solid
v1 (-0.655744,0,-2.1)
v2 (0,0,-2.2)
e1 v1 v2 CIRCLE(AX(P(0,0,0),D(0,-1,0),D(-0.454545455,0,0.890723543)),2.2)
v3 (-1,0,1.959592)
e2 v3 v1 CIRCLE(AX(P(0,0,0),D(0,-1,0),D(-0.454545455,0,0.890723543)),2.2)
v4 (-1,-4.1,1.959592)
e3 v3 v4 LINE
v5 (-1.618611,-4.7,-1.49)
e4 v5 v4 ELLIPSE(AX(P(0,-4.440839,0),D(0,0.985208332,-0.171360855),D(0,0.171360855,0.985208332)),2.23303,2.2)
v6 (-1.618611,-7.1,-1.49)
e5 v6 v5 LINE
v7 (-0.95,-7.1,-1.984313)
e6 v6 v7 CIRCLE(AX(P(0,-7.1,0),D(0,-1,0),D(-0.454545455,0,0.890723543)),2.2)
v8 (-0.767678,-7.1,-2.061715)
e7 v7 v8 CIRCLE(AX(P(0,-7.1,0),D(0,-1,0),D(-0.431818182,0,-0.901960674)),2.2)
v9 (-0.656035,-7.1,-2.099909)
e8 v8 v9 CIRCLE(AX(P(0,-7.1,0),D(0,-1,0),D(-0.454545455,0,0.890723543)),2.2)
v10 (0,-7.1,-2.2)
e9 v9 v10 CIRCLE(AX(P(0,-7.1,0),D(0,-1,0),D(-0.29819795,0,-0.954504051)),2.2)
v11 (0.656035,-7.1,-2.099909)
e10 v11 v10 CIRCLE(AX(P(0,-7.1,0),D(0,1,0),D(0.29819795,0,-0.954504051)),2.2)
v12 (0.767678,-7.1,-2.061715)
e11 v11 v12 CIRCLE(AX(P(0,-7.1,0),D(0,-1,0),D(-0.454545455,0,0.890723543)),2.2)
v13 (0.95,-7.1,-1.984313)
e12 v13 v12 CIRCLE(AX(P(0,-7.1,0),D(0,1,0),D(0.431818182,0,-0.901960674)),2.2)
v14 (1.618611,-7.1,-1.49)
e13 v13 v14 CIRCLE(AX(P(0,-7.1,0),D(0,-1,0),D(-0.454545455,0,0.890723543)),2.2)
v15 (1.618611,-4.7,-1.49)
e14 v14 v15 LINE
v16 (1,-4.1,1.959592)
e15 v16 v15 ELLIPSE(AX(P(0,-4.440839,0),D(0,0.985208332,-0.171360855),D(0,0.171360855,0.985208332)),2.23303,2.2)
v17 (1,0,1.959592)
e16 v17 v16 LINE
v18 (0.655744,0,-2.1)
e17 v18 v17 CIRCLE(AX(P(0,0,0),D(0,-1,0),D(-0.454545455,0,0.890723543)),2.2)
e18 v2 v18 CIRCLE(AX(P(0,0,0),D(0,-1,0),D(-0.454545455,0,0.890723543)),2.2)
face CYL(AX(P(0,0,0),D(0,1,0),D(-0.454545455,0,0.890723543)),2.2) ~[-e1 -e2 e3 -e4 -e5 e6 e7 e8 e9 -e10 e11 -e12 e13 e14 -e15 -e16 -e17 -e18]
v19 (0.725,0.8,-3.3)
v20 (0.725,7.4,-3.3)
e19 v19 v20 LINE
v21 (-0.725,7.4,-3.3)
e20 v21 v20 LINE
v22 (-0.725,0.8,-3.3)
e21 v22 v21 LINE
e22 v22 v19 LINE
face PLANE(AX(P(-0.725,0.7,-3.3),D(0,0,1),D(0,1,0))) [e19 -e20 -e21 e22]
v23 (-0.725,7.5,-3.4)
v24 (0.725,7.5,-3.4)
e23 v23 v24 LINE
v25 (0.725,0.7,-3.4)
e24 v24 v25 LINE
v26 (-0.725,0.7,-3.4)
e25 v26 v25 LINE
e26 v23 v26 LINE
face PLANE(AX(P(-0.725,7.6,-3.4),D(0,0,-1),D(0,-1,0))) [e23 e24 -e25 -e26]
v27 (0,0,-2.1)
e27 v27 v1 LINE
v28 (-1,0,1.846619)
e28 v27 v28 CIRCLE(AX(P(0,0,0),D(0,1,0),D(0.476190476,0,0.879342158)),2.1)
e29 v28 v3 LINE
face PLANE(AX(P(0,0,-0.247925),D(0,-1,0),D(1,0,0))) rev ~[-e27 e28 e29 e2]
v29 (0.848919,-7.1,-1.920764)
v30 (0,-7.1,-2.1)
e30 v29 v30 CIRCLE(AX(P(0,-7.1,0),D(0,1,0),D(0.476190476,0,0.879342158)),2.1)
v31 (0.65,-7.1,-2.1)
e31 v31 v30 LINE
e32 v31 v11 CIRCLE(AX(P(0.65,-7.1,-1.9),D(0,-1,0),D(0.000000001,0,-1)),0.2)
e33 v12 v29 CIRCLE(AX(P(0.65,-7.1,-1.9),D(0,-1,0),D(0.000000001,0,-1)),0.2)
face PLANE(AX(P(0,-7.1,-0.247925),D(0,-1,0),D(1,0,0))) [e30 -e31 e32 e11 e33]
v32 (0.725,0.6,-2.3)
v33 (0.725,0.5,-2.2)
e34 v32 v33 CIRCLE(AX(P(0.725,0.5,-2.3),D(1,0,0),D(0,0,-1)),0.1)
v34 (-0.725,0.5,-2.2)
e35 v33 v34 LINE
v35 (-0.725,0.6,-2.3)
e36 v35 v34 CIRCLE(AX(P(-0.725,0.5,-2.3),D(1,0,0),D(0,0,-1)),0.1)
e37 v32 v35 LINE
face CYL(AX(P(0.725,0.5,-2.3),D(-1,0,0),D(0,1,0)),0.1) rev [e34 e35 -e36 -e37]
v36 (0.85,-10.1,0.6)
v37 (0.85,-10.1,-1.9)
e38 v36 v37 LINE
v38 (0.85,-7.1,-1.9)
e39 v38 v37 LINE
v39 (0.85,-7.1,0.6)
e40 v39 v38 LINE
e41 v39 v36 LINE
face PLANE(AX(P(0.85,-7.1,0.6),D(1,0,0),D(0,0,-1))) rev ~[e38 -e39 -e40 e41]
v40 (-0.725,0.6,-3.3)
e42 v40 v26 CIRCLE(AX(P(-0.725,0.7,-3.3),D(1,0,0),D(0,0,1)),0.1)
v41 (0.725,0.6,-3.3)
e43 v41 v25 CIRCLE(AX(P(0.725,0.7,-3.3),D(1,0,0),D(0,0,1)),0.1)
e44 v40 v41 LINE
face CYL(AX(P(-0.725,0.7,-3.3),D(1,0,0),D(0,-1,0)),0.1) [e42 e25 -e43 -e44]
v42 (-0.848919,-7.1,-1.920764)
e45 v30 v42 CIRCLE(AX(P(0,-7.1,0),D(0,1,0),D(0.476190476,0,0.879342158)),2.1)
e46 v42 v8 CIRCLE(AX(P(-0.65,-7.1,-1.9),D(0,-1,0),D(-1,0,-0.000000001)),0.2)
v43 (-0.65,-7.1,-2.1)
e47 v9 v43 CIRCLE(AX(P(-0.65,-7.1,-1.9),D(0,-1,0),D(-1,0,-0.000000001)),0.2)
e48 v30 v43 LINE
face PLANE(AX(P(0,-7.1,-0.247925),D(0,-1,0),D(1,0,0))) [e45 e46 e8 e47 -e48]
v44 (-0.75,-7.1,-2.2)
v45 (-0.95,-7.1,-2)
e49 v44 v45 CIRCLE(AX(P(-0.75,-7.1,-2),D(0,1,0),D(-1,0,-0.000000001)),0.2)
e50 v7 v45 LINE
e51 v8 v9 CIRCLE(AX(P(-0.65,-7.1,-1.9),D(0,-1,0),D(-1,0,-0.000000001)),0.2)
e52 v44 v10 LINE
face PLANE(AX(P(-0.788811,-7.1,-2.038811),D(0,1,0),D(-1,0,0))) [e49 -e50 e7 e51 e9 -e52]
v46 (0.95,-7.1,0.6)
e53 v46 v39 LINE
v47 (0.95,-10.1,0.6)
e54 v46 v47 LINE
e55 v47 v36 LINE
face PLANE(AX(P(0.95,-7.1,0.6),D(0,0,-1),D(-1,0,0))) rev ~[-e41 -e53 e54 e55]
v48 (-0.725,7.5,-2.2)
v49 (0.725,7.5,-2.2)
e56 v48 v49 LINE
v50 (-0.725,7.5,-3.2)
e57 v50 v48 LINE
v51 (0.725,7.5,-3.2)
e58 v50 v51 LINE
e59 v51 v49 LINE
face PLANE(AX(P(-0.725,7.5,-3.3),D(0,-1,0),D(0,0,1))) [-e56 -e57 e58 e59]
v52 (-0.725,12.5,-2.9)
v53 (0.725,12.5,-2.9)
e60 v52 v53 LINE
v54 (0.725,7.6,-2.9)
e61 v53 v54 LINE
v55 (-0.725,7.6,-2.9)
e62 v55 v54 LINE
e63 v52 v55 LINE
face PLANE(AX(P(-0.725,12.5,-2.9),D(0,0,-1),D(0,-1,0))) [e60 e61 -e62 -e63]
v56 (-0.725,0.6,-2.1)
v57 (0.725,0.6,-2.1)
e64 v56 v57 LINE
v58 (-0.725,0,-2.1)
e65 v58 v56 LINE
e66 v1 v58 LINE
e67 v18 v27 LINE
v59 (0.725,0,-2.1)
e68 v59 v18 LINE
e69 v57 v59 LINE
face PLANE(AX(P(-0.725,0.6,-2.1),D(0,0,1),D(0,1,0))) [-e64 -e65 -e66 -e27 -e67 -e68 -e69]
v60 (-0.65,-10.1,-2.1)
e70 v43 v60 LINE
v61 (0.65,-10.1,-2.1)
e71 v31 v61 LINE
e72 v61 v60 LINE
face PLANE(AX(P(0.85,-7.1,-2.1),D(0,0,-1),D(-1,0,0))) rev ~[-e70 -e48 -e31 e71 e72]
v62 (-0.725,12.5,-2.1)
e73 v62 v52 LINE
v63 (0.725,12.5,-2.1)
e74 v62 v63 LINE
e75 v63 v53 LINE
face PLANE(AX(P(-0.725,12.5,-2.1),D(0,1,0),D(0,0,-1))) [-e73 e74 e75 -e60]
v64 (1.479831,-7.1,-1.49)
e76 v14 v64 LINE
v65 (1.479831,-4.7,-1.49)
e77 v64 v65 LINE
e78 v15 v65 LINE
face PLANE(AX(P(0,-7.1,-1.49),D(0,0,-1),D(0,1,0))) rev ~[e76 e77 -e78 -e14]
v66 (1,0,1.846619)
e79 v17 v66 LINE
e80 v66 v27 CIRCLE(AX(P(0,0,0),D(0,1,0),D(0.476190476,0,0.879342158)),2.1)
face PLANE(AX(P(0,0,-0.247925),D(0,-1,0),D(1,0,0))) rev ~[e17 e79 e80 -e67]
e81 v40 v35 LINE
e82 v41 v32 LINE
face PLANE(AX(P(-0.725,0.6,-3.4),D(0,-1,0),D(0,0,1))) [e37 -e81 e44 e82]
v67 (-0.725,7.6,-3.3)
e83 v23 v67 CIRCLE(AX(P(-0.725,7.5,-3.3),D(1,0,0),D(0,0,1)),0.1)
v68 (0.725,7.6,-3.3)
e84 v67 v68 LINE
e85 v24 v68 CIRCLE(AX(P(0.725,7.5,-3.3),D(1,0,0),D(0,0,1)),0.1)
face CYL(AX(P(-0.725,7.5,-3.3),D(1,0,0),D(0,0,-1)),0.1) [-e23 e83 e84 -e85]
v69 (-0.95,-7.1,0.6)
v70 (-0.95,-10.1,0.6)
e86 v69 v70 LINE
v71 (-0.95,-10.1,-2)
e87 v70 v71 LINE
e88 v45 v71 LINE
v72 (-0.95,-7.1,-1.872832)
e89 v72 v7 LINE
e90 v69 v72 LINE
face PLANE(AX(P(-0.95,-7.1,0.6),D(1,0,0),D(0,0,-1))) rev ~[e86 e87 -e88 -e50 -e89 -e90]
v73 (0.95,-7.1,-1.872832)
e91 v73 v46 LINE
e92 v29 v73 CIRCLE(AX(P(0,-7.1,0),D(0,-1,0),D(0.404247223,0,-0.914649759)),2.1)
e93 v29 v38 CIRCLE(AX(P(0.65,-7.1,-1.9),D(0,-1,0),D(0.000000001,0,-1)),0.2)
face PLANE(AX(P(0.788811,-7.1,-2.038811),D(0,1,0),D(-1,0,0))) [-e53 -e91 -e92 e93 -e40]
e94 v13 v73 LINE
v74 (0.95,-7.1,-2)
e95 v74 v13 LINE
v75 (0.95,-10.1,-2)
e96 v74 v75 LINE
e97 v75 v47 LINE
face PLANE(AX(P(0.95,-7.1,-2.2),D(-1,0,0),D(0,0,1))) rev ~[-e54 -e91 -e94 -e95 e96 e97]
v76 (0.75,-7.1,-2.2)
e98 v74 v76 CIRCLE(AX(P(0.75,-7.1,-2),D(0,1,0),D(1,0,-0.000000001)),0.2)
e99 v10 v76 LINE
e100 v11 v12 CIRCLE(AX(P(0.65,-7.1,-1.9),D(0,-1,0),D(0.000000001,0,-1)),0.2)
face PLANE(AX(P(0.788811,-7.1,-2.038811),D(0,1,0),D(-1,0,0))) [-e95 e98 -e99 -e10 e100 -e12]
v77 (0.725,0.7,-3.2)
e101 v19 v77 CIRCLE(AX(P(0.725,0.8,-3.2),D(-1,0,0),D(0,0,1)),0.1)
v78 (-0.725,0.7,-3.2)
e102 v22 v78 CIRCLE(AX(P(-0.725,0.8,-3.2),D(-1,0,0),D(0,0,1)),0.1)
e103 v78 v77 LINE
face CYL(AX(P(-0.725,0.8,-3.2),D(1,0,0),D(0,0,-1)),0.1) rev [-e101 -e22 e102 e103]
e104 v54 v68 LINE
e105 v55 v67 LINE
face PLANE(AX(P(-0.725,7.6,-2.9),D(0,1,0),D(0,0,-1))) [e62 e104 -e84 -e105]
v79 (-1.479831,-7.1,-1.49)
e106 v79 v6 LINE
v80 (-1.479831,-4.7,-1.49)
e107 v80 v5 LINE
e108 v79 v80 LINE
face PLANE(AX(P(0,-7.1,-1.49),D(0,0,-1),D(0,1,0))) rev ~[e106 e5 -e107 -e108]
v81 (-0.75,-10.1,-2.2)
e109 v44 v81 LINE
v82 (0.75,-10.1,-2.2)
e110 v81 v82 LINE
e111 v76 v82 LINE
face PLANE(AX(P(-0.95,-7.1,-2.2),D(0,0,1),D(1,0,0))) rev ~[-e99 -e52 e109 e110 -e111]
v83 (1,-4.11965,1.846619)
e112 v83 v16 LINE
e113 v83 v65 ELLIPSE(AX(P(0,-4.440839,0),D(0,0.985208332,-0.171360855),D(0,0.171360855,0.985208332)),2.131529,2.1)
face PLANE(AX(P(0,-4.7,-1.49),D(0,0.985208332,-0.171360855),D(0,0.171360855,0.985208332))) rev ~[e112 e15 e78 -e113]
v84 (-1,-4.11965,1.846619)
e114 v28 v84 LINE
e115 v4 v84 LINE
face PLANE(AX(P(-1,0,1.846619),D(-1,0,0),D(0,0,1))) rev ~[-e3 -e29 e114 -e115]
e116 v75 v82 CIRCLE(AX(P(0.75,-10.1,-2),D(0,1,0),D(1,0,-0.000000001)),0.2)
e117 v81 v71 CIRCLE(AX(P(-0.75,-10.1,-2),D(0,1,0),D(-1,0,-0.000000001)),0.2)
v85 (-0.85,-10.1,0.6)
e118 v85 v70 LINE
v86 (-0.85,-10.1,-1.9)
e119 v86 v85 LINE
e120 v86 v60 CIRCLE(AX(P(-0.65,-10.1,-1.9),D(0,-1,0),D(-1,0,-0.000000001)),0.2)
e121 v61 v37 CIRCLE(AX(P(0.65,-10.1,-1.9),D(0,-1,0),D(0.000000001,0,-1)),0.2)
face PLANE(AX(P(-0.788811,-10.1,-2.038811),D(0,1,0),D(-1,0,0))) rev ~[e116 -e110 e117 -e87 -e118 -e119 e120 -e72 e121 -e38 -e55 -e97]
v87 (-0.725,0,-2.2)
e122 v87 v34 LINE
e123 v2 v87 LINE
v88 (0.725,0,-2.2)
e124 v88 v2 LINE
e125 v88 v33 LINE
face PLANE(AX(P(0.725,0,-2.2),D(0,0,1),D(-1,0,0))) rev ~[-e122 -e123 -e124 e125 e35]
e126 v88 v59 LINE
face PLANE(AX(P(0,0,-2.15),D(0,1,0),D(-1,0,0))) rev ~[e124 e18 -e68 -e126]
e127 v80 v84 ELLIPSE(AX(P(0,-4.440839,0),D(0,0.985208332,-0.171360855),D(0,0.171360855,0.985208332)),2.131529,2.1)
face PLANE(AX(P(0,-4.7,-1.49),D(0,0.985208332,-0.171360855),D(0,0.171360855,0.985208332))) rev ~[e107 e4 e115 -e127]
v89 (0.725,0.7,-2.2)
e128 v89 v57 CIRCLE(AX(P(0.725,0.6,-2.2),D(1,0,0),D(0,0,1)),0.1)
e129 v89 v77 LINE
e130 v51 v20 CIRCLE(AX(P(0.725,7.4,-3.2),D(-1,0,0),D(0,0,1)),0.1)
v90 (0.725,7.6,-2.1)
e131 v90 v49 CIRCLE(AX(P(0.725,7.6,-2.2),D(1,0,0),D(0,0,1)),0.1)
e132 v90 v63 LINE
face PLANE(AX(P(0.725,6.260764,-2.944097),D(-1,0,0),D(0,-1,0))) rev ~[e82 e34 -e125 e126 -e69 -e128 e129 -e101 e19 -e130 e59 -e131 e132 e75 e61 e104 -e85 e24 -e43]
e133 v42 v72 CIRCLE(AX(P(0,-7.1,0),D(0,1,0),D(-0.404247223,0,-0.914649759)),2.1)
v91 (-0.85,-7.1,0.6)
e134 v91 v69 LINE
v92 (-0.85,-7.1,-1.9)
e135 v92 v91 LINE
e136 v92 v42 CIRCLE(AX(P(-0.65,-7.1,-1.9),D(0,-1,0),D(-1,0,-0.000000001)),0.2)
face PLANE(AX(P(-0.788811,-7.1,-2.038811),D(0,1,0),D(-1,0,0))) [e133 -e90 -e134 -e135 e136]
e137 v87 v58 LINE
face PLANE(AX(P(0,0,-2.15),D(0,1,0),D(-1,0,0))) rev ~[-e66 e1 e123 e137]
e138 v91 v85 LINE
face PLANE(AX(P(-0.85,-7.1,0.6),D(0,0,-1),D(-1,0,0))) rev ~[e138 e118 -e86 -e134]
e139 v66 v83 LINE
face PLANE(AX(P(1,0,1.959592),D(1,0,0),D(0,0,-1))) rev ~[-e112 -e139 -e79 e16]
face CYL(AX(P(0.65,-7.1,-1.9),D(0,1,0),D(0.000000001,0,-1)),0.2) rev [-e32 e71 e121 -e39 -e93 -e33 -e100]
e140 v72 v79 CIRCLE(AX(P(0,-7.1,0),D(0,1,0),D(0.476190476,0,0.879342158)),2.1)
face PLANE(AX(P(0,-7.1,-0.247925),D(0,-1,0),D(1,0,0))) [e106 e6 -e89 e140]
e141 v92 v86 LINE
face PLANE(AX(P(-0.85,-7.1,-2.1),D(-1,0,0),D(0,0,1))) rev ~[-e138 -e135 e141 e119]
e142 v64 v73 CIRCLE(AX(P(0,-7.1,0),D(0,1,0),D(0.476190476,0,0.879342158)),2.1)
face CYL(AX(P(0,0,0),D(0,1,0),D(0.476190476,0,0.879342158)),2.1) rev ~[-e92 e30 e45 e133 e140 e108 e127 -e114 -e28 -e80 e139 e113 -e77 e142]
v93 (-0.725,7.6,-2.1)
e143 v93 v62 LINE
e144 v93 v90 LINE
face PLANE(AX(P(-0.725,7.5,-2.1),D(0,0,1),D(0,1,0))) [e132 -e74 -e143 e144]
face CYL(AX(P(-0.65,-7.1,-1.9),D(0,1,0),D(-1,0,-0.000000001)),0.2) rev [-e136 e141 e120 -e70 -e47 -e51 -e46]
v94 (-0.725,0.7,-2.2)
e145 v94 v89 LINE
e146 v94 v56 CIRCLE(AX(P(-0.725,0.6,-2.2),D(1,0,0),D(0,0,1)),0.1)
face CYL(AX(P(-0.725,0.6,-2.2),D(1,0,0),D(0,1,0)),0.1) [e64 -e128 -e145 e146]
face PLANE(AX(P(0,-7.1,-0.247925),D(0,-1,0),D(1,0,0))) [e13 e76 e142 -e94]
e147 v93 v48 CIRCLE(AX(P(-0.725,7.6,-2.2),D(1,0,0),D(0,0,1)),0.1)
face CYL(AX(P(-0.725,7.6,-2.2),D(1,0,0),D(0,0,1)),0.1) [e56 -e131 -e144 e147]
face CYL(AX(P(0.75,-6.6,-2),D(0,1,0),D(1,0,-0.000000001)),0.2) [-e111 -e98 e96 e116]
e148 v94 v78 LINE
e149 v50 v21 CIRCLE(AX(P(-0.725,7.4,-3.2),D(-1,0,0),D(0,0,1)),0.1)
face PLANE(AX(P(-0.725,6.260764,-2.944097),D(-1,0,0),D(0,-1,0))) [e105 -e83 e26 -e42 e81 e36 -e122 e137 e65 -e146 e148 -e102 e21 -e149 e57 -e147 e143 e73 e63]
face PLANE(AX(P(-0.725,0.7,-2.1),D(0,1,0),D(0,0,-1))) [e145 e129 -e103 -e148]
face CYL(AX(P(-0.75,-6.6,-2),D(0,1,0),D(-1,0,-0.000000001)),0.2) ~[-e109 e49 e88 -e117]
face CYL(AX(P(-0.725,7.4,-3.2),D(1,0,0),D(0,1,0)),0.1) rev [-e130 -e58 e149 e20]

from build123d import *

# Parameters (mm, degrees)
F1_DEPTH     = 7.1
F2_W         = 1.45
F2_H         = 0.1
F3_DEPTH     = 0.6
F5_DEPTH     = 1.45
F6_R         = 0.1
F8_DEPTH     = 40
F10_DEPTH    = 3
F11_T1_DEPTH = 3
F11_T3_DEPTH = 4


# Not quite as in the source:
# - a fillet or chamfer that OpenCascade refuses, or shapes differently, is made with other operations: its cross-section is extruded or revolved along the edge and cut away or added


with BuildPart() as f1:
    # F0 (on Front) → F1 (new body)
    with BuildSketch(Plane.XZ):
        with BuildLine():
            Line((-1, 1.8466185313), (-1, 1.9595917942))
            ThreePointArc((-1, 1.9595917942), (0, -2.2), (1, 1.9595917942))
            Line((1, 1.9595917942), (1, 1.8466185313))
            ThreePointArc((1, 1.8466185313), (0, -2.1), (-1, 1.8466185313))
        make_face()
    extrude(amount=F1_DEPTH)

    # F2 (on face) → F3 (join)
    with BuildSketch(Plane(origin=(0, 0, 0), x_dir=(-1, 0, 0), z_dir=(0, 1, 0))):
        with Locations((0, -2.15)):
            Rectangle(F2_W, F2_H)
    extrude(amount=F3_DEPTH)

    # F4 (on face) → F5 (join, through all)
    with BuildSketch(Plane(origin=(-0.725, 0, 0), x_dir=(0, -1, 0), z_dir=(-1, 0, 0))):
        Polygon((-0.6, -3.4), (-0.6, -2.1), (-0.7, -2.1), (-0.7, -3.3), (-7.5, -3.3), (-7.5, -2.9), (-7.5, -2.1), (-12.5, -2.1), (-12.5, -2.9), (-7.6, -2.9), (-7.6, -3.4), align=None)
    extrude(amount=-F5_DEPTH)

    # F6
    f6_edges = [f1.edges().sort_by_distance(p)[0] for p in [
        (0, 0.7, -2.1),
        (0, 0.6, -2.2),
        (0, 0.6, -3.4),
        (0, 0.7, -3.3),
        (0, 7.5, -3.3),
        (0, 7.5, -2.1),
        (0, 7.6, -3.4),
    ]]
    fillet(f6_edges, radius=F6_R)

    # F7 (on Right) → F8 (cut, symmetric)
    with BuildSketch(Plane.YZ):
        Polygon((-4.7, -1.49), (-4.1, 1.9595917942), (-7.1, 1.9595917942), (-7.1, -1.49), align=None)
    extrude(amount=F8_DEPTH, both=True, mode=Mode.SUBTRACT)

    # F9 (on face) → F10 (join)
    with BuildSketch(Plane.XZ.offset(7.1)):
        Polygon((-0.95, 0.6), (-0.95, -2.2), (0.95, -2.2), (0.95, 0.6), (0.85, 0.6), (0.85, -2.1), (-0.85, -2.1), (-0.85, 0.6), align=None)
    extrude(amount=F10_DEPTH)

    # F11: fillet of radius 0.2 on 4 edges, made by hand

    # F11_s2 → F11_t1 (join)
    with BuildSketch(Plane.XZ.offset(7.1)):
        with BuildLine():
            ThreePointArc((-0.85, -1.9), (-0.7914213562, -2.0414213562), (-0.65, -2.1))
            Line((-0.65, -2.1), (-0.85, -2.1))
            Line((-0.85, -2.1), (-0.85, -1.9))
        make_face()
        with BuildLine():
            ThreePointArc((0.65, -2.1), (0.7914213562, -2.0414213562), (0.85, -1.9))
            Line((0.85, -1.9), (0.85, -2.1))
            Line((0.85, -2.1), (0.65, -2.1))
        make_face()
    extrude(amount=F11_T1_DEPTH)

    # F11_s4 → F11_t3 (cut)
    with BuildSketch(Plane.XZ.offset(6.6)):
        with BuildLine():
            ThreePointArc((-0.95, -2), (-0.8914213562, -2.1414213562), (-0.75, -2.2))
            Line((-0.75, -2.2), (-0.95, -2.2))
            Line((-0.95, -2.2), (-0.95, -2))
        make_face()
        with BuildLine():
            ThreePointArc((0.95, -2), (0.8914213562, -2.1414213562), (0.75, -2.2))
            Line((0.75, -2.2), (0.95, -2.2))
            Line((0.95, -2.2), (0.95, -2))
        make_face()
    extrude(amount=F11_T3_DEPTH, mode=Mode.SUBTRACT)


solid = f1.part
